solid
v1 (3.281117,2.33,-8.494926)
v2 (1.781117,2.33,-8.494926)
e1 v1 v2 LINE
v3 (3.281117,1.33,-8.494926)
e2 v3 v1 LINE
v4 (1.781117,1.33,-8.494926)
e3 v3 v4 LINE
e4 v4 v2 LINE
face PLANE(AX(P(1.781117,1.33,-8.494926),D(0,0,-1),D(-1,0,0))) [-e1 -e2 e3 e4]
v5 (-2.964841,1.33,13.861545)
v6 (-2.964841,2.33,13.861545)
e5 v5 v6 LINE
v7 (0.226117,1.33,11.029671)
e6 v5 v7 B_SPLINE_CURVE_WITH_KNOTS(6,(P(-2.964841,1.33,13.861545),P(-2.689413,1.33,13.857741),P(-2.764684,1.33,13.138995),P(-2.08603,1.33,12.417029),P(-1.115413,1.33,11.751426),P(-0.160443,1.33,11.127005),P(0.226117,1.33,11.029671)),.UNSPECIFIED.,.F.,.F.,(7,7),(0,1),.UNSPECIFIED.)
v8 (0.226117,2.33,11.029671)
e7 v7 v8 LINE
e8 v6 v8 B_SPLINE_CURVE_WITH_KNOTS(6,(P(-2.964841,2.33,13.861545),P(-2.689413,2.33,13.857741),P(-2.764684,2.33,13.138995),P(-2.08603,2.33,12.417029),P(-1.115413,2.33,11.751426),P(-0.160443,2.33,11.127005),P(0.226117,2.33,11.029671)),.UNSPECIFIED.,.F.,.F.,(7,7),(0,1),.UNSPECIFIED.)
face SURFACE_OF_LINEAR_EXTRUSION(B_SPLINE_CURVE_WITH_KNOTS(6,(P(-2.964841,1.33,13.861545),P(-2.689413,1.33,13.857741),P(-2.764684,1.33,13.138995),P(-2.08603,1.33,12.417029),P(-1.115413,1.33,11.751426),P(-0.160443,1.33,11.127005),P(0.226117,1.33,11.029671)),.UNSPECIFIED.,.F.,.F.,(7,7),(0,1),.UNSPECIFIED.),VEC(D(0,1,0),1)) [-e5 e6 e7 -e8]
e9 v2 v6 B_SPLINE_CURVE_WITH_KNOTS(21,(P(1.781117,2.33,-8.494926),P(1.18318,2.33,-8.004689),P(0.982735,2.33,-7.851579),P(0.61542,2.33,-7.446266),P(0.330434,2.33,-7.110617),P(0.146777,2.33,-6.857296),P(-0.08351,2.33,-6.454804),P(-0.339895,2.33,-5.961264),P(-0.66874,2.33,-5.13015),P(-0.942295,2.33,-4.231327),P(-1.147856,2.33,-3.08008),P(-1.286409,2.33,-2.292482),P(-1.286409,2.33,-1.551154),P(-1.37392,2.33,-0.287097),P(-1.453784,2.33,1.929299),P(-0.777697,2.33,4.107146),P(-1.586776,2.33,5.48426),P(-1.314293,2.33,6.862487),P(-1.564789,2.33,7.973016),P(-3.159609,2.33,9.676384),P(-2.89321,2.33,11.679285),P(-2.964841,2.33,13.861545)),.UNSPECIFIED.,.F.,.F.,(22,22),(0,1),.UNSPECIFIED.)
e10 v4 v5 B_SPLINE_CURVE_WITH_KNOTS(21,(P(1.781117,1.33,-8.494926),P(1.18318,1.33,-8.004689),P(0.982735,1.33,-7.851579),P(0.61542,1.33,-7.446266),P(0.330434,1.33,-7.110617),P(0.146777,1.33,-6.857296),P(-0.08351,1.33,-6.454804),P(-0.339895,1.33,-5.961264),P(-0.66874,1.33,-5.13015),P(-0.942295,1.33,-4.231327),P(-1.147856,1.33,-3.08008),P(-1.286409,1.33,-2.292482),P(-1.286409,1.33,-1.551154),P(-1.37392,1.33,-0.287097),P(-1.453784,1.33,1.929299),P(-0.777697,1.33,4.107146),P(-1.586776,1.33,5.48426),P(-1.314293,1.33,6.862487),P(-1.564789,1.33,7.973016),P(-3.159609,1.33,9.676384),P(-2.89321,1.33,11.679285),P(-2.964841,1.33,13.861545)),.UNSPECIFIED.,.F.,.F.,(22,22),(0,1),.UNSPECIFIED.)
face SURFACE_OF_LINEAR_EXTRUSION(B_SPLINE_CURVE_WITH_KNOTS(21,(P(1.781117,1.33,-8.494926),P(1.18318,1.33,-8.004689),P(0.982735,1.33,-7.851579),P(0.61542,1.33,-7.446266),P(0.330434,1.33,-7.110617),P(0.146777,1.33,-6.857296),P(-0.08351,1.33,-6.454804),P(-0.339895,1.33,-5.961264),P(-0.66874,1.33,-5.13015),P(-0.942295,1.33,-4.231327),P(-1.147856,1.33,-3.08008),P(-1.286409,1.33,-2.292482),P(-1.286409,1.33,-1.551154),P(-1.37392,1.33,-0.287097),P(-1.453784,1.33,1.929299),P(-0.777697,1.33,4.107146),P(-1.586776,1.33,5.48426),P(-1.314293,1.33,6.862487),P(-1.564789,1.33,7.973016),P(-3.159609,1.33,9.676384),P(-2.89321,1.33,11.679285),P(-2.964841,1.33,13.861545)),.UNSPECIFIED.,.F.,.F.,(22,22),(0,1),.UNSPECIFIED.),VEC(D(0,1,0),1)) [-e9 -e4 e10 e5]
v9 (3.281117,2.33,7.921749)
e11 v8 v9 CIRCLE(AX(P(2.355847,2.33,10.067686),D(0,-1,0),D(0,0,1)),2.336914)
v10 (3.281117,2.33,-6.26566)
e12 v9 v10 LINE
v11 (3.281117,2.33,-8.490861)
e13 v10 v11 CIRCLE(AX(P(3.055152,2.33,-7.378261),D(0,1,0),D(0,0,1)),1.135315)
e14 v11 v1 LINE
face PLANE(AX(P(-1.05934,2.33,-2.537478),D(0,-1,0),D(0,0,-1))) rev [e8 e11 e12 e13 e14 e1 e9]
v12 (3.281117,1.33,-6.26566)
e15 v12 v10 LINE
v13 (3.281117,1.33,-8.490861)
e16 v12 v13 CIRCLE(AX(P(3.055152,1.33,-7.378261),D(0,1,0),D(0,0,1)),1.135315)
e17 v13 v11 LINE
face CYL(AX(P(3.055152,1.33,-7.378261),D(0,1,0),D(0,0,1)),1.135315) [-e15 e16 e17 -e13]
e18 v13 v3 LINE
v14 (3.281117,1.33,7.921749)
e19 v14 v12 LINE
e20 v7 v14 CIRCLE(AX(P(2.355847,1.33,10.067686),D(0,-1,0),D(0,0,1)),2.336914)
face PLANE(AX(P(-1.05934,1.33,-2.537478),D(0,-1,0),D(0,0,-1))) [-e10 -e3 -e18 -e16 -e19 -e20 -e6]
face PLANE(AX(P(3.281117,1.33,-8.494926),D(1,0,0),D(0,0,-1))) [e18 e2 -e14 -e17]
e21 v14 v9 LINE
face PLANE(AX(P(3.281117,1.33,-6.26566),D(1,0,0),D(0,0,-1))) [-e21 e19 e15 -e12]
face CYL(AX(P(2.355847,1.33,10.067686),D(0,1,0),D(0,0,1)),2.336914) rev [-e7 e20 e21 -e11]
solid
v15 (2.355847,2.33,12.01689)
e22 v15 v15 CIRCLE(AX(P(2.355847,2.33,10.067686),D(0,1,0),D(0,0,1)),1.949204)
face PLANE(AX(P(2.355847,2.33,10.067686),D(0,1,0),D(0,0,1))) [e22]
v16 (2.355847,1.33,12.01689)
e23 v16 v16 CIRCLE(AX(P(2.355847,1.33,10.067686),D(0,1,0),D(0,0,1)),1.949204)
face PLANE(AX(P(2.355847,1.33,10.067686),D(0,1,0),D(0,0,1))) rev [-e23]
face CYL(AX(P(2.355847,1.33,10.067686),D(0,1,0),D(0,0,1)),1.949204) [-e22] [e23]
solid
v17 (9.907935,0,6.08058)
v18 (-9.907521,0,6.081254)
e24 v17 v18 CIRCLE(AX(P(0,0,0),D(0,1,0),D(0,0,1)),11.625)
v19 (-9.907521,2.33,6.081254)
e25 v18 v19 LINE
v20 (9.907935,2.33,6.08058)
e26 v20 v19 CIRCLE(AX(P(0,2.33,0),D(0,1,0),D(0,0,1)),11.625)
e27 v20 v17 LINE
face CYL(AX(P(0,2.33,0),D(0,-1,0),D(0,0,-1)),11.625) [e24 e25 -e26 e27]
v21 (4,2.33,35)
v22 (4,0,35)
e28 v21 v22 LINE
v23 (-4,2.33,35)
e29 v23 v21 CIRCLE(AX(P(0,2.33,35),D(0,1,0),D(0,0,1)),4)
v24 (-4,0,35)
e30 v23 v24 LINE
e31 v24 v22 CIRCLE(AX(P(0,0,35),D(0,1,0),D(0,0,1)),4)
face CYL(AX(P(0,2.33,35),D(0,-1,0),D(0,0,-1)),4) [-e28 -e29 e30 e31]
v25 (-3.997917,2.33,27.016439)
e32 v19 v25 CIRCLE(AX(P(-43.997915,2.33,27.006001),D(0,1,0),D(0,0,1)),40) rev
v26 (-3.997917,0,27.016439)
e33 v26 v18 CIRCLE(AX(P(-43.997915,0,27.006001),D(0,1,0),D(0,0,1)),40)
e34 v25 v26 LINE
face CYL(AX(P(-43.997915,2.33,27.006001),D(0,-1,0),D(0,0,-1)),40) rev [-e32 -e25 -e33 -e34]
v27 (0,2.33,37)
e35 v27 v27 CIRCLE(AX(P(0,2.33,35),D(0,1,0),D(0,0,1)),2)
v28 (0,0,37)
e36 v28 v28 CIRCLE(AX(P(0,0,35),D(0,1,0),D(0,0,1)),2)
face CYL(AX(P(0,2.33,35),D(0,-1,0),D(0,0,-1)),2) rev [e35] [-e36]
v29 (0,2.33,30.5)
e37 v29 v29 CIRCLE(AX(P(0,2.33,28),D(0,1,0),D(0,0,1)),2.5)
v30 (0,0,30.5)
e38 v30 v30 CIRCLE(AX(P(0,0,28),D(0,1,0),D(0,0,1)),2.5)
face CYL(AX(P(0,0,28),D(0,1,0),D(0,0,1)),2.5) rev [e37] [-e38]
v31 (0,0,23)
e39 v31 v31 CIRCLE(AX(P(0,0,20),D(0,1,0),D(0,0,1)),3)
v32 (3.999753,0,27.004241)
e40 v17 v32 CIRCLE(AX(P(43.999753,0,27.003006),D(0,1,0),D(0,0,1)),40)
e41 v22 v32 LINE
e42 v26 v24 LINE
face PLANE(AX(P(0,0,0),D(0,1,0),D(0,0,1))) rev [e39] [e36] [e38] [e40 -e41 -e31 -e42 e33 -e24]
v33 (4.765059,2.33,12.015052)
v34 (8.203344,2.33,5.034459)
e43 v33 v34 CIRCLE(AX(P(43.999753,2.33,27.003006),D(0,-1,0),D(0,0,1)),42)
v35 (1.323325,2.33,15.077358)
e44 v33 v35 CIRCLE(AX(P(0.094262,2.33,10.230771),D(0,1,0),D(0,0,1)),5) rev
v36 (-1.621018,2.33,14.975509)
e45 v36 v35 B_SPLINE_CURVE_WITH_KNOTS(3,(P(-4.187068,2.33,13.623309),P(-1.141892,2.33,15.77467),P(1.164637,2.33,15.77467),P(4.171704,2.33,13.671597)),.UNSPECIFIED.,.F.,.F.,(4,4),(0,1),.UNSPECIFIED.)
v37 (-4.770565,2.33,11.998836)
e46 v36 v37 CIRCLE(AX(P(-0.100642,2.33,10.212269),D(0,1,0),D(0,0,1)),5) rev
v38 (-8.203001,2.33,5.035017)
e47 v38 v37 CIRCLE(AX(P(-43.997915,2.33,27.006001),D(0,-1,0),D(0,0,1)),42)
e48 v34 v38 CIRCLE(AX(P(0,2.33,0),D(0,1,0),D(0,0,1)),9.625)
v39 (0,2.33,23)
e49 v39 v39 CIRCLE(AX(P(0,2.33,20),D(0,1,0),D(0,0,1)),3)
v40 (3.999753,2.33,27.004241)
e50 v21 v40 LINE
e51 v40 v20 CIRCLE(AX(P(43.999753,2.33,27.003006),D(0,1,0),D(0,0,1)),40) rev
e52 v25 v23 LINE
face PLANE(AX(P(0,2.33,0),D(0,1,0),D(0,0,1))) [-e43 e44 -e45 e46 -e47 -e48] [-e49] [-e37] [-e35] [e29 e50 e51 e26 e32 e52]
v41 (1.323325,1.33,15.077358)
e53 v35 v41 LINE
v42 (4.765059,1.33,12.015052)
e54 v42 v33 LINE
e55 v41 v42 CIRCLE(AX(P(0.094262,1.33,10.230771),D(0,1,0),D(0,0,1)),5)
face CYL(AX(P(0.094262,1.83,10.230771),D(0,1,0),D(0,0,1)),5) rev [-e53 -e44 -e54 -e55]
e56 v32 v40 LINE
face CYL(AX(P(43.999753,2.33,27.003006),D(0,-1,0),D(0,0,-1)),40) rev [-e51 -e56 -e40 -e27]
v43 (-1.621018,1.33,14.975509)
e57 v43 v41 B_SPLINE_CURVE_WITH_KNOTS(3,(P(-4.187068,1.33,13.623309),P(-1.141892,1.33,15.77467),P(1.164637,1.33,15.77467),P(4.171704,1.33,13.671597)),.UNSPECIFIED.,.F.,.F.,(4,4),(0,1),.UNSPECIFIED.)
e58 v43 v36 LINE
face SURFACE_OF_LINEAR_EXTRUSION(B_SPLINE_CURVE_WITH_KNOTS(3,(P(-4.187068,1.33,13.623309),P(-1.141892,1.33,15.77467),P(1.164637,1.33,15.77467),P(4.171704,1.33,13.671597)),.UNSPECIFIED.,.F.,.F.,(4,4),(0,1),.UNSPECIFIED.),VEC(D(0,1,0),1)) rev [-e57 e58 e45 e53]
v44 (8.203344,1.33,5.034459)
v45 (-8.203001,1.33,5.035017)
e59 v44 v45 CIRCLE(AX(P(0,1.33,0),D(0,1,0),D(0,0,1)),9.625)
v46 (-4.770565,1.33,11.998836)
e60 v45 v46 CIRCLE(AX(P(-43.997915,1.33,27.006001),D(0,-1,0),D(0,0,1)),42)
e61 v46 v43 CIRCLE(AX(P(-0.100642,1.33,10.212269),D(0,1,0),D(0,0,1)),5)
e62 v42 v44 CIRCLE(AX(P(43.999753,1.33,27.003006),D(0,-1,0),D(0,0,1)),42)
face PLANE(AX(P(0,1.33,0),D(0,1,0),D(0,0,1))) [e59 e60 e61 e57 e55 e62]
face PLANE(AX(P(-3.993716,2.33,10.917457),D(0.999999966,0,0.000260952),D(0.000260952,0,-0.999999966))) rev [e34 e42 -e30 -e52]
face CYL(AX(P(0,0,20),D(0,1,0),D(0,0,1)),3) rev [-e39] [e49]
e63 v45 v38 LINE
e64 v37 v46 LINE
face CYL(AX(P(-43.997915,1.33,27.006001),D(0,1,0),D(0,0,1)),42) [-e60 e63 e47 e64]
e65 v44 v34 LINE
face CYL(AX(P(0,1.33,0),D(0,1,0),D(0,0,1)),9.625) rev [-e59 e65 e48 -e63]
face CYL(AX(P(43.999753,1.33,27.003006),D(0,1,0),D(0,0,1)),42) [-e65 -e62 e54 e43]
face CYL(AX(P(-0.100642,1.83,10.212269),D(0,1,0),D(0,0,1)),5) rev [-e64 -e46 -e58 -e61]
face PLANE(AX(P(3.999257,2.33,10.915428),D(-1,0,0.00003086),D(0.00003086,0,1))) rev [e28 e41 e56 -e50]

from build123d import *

# Parameters (mm, degrees)
SKETCH1_R               = 2
BOSS_EXTRUDE1_DEPTH     = 2.33
FILLET1_R               = 40
SKETCH3_R               = 2.5
SKETCH3_R_2             = 3
CUT_EXTRUDE1_DEPTH      = 41.762354262
CUT_EXTRUDE3_DEPTH      = 1
BOSS_EXTRUDE3_START     = -1
BOSS_EXTRUDE3_OUTLINE_R = 1.949204175
BOSS_EXTRUDE3_DEPTH     = 1
FILLET2_R               = 5


# Read off the part's stored shape, not the designer's step: Boss-Extrude3
with BuildPart() as part:
    # Sketch1 → Boss-Extrude1 (new body)
    with BuildSketch(Plane(origin=(0, 0, 0), x_dir=(1, 0, 0), z_dir=(0, 1, 0))):
        with BuildLine():
            Line((-3.993715603, -10.917456695), (-4, -35))
            ThreePointArc((-4, -35), (0, -39), (4, -35))
            Line((4, -35), (3.999256749, -10.915428093))
            ThreePointArc((3.999256749, -10.915428093), (-0.002950403, 11.624999626), (-3.993715603, -10.917456695))
        make_face()
        with Locations(Location((0, -35, 0), (0, 0, 270))):
            Circle(SKETCH1_R, mode=Mode.SUBTRACT)
    extrude(amount=BOSS_EXTRUDE1_DEPTH)

    # Fillet1
    fillet1_edges = [part.edges().sort_by_distance(p)[0] for p in [
        (3.999256749, 1.165, 10.915428093),
        (-3.993715603, 1.165, 10.917456695),
    ]]
    fillet(fillet1_edges, radius=FILLET1_R)

    # Sketch3 → Cut-Extrude1 (cut, through all)
    with BuildSketch(Plane(origin=(0, 2.33, 0), x_dir=(1, 0, 0), z_dir=(0, 1, 0))):
        with Locations(Location((0, -28, 0), (0, 0, 270))):
            Circle(SKETCH3_R)
        with Locations(Location((0, -20, 0), (0, 0, 270))):
            Circle(SKETCH3_R_2)
    extrude(amount=-CUT_EXTRUDE1_DEPTH, mode=Mode.SUBTRACT)

    # Sketch12 → Cut-Extrude3 (cut)
    with BuildSketch(Plane(origin=(0, 2.33, 0), x_dir=(1, 0, 0), z_dir=(0, 1, 0))):
        with BuildLine():
            ThreePointArc((8.203343823, -5.034458772), (5.941708971, -9.23828641), (4.171703771, -13.671596755))
            add(Edge.make_bspline(
                [(-4.187068138, -13.623308604), (-1.141891972, -15.774669541), (1.16463665, -15.774669541), (4.171703771, -13.671596755)],
                knots=[0, 0, 0, 0, 1, 1, 1, 1], degree=3))
            ThreePointArc((-4.187068138, -13.623308604), (-5.951923746, -9.215482827), (-8.203001159, -5.035017078))
            ThreePointArc((-8.203001159, -5.035017078), (-0.000327538, 9.624999994), (8.203343823, -5.034458772))
        make_face()
    extrude(amount=-CUT_EXTRUDE3_DEPTH, mode=Mode.SUBTRACT)

    # Fillet2
    fillet2_edges = [part.edges().sort_by_distance(p)[0] for p in [
        (4.171703771, 1.83, 13.671596755),
        (-4.187068138, 1.83, 13.623308604),
    ]]
    fillet(fillet2_edges, radius=FILLET2_R)


with BuildPart() as body_2:
    # Boss-Extrude3 outline → Boss-Extrude3 (new body)
    with BuildSketch(Plane(origin=(0, 2.33, 0), x_dir=(1, 0, 0), z_dir=(0, 1, 0)).offset(BOSS_EXTRUDE3_START)):
        with BuildLine():
            Line((3.281117116, 8.494925514), (1.781117116, 8.494925514))
            add(Edge.make_bspline(
                [(1.781117116, 8.494925514), (1.183180059, 8.004689197), (0.982734781, 7.851579078), (0.615420043, 7.446266263), (0.33043447, 7.110616589), (0.1467771, 6.857296079), (-0.083510311, 6.454804461), (-0.339895148, 5.961263649), (-0.668740254, 5.130149544), (-0.942295018, 4.231326747), (-1.147855824, 3.080080282), (-1.28640882, 2.292482291), (-1.28640882, 1.551154161), (-1.373920485, 0.287096774), (-1.453784327, -1.929298886), (-0.777696731, -4.107146497), (-1.586776077, -5.484260387), (-1.314293328, -6.862486953), (-1.564788612, -7.973016044), (-3.159608585, -9.676383972), (-2.893209822, -11.679284919), (-2.964841412, -13.861545101)],
                knots=[0, 0, 0, 0, 0, 0, 0, 0, 0, 0, 0, 0, 0, 0, 0, 0, 0, 0, 0, 0, 0, 0, 1, 1, 1, 1, 1, 1, 1, 1, 1, 1, 1, 1, 1, 1, 1, 1, 1, 1, 1, 1, 1, 1], degree=21))
            add(Edge.make_bspline(
                [(-2.964841412, -13.861545101), (-2.68941343, -13.857740882), (-2.764683546, -13.138994944), (-2.086029899, -12.417028626), (-1.115412929, -11.751425652), (-0.16044275, -11.127005362), (0.226117199, -11.029671441)],
                knots=[0, 0, 0, 0, 0, 0, 0, 1, 1, 1, 1, 1, 1, 1], degree=6))
            ThreePointArc((0.226117199, -11.029671441), (0.689271081, -8.429488184), (3.281117116, -7.921749452))
            Line((3.281117116, -7.921749452), (3.281117116, 6.265660141))
            ThreePointArc((3.281117116, 6.265660141), (4.190467303, 7.378260653), (3.281117116, 8.490861165))
            Line((3.281117116, 8.490861165), (3.281117116, 8.494925514))
        make_face()
        with Locations((2.355847123, -10.067685567)):
            Circle(BOSS_EXTRUDE3_OUTLINE_R)
    extrude(amount=BOSS_EXTRUDE3_DEPTH)


solid = Compound([part.part, body_2.part])
